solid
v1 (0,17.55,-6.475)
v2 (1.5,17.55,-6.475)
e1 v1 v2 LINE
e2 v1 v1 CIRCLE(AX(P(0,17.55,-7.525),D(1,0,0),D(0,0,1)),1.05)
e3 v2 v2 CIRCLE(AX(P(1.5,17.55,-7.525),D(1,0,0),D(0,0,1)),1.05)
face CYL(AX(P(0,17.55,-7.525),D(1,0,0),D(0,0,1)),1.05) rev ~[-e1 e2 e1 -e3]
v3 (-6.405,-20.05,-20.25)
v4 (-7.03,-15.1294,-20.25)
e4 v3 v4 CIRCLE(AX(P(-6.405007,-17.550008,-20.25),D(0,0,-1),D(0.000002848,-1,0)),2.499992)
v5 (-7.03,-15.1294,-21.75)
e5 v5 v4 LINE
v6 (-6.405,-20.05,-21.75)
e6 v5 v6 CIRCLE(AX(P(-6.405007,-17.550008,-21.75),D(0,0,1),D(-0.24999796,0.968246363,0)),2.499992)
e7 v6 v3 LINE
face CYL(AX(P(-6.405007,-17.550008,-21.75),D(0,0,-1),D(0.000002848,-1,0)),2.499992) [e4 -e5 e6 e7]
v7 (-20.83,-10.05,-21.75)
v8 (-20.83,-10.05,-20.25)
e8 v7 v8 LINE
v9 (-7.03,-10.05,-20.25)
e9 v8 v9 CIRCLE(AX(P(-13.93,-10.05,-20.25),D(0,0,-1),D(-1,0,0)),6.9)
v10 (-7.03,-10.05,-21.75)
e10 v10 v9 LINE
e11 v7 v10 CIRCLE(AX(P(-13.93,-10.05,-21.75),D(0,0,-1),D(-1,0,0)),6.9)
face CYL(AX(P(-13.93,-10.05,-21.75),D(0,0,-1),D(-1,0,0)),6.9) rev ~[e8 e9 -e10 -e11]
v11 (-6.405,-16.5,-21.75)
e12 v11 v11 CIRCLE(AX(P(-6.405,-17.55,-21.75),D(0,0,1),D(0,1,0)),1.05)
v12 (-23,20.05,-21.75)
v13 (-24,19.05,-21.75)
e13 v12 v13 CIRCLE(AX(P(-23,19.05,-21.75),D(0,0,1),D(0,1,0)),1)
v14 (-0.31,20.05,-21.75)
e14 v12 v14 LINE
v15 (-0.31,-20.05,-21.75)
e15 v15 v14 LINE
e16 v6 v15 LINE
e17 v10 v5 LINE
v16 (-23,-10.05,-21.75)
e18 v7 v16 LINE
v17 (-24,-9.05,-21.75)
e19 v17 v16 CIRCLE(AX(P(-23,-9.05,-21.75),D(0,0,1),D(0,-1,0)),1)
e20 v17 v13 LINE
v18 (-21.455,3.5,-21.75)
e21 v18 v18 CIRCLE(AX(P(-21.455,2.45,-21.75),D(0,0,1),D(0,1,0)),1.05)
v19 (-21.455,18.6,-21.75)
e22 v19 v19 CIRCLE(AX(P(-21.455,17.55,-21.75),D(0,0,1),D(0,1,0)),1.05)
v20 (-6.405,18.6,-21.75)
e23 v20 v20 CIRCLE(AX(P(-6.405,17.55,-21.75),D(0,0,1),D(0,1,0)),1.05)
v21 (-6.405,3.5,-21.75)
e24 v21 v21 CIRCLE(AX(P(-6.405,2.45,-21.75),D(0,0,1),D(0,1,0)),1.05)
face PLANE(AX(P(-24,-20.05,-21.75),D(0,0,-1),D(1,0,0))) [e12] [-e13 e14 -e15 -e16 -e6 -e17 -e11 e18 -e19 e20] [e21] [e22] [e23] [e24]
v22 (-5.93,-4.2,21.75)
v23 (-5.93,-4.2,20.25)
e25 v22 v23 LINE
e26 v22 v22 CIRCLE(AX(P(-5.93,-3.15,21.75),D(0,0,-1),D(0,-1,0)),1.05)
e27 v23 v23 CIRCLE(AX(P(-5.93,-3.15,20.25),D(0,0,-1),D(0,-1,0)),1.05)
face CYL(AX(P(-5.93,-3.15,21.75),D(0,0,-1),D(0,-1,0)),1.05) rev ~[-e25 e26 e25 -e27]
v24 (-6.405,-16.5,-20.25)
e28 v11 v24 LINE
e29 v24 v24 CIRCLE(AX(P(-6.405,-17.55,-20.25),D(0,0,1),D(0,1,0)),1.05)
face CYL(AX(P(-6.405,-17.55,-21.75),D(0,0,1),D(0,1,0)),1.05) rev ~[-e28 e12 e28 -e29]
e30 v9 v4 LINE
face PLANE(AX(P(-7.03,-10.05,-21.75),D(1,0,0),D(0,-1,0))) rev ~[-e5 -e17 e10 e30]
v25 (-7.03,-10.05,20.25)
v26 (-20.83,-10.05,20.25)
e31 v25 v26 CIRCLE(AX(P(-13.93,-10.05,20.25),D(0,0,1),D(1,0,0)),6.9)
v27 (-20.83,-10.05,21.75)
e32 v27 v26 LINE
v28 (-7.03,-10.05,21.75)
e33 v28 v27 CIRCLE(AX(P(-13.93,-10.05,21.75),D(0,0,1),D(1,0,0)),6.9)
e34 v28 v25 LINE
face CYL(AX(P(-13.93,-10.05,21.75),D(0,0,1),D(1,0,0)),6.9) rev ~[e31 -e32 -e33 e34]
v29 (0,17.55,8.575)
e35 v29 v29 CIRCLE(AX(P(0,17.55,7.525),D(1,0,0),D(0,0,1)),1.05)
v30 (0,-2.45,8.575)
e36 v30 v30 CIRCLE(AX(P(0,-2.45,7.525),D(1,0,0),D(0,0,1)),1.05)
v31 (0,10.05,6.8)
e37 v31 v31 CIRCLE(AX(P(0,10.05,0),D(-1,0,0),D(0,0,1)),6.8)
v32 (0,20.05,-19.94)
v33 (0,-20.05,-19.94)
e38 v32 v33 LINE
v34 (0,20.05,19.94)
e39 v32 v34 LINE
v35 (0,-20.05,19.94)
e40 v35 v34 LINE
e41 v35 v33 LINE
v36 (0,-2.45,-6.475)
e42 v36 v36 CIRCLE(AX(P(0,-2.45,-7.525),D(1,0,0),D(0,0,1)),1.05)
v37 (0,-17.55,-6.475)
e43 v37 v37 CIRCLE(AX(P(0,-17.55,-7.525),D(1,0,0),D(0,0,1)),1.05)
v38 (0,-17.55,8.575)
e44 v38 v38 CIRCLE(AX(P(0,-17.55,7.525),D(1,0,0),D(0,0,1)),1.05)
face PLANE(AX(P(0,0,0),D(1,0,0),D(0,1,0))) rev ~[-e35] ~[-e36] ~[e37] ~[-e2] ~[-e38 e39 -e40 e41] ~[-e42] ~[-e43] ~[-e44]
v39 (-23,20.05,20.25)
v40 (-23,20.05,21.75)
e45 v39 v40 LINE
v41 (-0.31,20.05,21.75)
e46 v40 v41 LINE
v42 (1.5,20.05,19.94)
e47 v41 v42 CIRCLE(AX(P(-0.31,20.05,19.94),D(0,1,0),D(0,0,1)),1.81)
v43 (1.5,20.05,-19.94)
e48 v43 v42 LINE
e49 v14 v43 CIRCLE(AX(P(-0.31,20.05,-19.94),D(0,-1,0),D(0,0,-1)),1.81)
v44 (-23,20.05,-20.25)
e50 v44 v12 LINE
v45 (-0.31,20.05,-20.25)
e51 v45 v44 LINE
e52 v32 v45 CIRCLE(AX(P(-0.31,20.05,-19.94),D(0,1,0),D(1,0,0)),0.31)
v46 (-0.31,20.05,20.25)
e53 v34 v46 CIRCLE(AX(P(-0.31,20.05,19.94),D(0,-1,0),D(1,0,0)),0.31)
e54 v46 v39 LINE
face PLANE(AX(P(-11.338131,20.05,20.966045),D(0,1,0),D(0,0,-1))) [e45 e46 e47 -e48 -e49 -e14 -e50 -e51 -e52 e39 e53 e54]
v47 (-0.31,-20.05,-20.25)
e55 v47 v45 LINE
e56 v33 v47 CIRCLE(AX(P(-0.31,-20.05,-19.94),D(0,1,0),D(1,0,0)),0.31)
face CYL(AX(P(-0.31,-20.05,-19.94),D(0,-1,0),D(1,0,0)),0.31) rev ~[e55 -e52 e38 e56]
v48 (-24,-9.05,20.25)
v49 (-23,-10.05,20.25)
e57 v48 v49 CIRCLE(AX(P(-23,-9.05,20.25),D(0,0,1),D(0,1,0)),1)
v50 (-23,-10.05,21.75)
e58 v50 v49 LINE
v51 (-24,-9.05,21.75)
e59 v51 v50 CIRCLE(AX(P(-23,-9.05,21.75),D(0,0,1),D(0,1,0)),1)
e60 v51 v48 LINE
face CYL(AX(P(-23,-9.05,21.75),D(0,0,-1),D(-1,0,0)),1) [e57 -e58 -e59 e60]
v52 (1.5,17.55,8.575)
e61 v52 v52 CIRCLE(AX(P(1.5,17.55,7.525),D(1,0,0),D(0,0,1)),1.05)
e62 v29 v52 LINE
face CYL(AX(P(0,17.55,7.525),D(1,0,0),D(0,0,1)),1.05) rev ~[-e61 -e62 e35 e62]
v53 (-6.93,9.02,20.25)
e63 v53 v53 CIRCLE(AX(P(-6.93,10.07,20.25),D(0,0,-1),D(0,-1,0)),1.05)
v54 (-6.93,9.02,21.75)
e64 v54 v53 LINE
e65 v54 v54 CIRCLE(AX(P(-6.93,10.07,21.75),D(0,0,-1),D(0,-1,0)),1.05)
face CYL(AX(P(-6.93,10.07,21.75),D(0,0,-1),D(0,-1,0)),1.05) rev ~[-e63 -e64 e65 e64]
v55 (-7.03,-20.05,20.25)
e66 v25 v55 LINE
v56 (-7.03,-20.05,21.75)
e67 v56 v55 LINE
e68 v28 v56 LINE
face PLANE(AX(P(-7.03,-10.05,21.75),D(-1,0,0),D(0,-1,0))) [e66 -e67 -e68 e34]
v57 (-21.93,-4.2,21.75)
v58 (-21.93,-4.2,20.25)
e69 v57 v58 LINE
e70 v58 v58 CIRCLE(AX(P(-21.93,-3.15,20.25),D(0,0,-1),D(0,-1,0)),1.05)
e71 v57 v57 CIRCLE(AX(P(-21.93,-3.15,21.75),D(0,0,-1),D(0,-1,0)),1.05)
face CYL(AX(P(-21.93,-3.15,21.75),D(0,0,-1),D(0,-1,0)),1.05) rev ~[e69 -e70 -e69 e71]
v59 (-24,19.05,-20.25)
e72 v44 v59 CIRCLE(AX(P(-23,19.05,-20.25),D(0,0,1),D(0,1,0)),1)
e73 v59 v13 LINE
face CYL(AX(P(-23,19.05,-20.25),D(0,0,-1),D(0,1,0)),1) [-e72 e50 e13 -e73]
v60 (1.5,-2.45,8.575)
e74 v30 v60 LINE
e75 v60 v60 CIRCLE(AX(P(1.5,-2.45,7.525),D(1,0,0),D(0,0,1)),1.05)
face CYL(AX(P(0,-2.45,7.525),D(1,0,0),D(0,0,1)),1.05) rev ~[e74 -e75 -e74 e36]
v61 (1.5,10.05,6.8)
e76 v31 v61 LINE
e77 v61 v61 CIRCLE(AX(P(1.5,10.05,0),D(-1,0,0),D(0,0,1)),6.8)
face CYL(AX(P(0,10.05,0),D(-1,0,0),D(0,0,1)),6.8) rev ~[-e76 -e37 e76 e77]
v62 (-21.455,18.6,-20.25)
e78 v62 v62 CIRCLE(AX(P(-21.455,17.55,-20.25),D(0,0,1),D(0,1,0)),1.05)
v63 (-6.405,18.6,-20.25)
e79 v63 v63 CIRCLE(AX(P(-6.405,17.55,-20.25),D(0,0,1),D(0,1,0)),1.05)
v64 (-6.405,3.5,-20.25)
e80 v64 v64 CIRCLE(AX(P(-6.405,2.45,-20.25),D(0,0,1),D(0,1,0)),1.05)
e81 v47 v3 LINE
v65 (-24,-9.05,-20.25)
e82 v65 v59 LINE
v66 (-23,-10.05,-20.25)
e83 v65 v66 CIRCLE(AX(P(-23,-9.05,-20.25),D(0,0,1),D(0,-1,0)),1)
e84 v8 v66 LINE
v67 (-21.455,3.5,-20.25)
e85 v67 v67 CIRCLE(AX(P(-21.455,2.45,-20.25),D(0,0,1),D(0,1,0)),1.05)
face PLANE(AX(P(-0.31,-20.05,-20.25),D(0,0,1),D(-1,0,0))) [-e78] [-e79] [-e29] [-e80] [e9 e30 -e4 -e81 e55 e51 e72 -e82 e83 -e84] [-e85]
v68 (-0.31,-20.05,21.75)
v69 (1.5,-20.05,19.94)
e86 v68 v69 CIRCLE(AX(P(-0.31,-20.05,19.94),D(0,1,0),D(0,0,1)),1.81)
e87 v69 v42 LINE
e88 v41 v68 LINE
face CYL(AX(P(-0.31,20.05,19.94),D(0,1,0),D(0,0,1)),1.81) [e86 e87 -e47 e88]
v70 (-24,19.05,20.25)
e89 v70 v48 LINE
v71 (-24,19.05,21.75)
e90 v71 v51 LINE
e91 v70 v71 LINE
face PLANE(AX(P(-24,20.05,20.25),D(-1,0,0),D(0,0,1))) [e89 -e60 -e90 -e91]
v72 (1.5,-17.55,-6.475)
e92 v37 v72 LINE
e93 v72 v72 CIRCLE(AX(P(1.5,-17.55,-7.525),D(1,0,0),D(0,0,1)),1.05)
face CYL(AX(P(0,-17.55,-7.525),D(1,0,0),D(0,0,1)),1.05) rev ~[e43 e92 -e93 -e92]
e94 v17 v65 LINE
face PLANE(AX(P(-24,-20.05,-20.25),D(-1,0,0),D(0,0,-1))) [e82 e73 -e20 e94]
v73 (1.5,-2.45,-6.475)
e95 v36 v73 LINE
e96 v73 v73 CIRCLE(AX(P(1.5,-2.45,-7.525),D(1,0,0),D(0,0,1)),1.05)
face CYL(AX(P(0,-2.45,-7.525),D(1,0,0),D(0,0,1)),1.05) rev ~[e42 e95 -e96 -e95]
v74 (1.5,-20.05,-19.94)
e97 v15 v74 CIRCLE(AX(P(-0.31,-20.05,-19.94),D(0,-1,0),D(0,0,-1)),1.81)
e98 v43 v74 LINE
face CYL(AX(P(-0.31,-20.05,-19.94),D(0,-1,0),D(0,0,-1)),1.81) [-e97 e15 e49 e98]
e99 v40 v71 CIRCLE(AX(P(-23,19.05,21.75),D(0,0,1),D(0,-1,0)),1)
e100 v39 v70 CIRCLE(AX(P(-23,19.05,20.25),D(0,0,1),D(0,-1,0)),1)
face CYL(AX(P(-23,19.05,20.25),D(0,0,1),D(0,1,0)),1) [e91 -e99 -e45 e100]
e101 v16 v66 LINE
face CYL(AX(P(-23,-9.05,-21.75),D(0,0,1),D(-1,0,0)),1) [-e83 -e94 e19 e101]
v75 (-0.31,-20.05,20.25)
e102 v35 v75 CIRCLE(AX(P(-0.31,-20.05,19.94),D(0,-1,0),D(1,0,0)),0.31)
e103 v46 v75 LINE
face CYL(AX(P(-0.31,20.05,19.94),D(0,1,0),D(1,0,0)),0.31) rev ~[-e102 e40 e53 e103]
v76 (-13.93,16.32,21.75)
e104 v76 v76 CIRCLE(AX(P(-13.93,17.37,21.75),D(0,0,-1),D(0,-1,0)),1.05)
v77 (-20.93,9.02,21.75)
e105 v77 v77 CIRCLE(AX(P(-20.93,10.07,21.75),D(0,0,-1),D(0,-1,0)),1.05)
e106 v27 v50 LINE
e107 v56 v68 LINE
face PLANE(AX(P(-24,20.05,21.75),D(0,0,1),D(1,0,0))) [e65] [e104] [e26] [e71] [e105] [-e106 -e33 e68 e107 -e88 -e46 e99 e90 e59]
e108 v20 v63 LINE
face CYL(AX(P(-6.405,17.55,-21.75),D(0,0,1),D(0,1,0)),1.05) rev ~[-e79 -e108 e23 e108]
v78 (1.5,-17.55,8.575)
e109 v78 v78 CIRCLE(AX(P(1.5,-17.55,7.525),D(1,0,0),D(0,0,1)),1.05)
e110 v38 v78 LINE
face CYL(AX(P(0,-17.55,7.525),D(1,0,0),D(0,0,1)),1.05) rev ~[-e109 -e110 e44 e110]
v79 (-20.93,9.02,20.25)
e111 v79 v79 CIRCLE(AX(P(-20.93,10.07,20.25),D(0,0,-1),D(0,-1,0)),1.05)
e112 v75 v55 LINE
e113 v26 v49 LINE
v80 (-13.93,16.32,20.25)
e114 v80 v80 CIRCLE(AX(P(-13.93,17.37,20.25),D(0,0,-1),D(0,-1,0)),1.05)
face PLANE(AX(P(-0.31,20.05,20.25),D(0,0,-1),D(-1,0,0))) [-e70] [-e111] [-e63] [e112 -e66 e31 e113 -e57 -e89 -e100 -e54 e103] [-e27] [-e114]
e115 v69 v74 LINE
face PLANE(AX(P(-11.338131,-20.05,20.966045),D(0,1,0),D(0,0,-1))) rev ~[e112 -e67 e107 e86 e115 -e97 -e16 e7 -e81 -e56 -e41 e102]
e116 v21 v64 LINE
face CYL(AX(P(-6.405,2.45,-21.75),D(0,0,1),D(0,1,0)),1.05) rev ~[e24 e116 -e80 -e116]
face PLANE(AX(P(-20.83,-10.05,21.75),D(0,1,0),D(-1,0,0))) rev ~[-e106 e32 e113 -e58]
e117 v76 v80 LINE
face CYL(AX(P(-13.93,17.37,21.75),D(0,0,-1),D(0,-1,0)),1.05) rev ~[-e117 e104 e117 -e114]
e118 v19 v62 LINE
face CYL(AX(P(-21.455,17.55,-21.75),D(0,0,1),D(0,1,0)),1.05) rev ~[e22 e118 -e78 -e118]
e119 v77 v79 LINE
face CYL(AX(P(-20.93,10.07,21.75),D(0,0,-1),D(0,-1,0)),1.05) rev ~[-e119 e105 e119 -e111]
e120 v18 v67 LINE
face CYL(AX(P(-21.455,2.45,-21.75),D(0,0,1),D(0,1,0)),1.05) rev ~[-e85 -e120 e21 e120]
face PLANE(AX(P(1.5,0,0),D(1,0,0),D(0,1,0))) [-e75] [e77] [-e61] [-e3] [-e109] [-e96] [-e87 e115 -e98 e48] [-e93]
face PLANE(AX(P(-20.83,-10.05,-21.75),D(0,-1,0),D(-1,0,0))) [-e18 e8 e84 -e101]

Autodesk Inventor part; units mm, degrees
ref_plane "YZ Plane" through (0, 0, 0) normal (1, 0, 0) x (0, 1, 0)
ref_plane "XZ Plane" through (0, 0, 0) normal (0, 1, 0) x (-1, 0, 0)
ref_plane "XY Plane" through (0, 0, 0) normal (0, 0, 1) x (1, 0, 0)
sketch "Sketch1" plane through (0, 0, 0) normal (1, 0, 0) x (0, 1, 0)
  line L0 (20.05, 20.25) -> (-20.05, 20.25)
  line L1 (-20.05, 20.25) -> (-20.05, -20.25)
  line L2 (-20.05, -20.25) -> (20.05, -20.25)
  line L3 (20.05, -20.25) -> (20.05, 20.25)
  line L4 (20.05, 20.25) -> (-20.05, -20.25) construction
  line L5 (-20.05, 20.25) -> (20.05, -20.25) construction
  point P0 (0, 0)
  dimension "d0" = 40.1
  dimension "d1" = 40.5
extrude "Plate1" add sketch "Sketch1" along normal blind 1.5
sketch "Sketch2" plane through (0, 20.05, 20.25) normal (0, 0, 1) x (1, 0, 0)
  line L0 (0, -40.1) -> (0, 0)
  line L1 (0, 0) -> (-24, 0)
  line L2 (-24, 0) -> (-24, -40.1)
  line L3 (-24, -40.1) -> (0, -40.1)
edge flange "Flange1" height 25.5 angle 90 thickness 1.5 bend radius 0.31 thickness toward (0, 0, 1) relief tear relief width 1.5 relief depth 0.75 corner gap 0.31 corner form 0 edges at (0, 0, 20.25) (0, 0, -20.25) wall of the first edge with corners at (0, -20.05, 20.25) (0, 20.05, 20.25) (-24, 20.05, 20.25) (-24, -20.05, 20.25)
bend "Bend1"
corner "Corner1"
sketch "Sketch3" plane through (-24, -20.05, 21.75) normal (0, 0, 1) x (1, 0, 0)
  circle A0 centre (10.07, 10) radius 6.4 projected
  line L0 (0, 0) -> (0, 40.1) projected
  line L1 (23.69, 0) -> (0, 0) projected
  line L2 (23.69, 0) -> (23.69, 40.1) projected
  circle A1 centre (10.07, 10) radius 6.9
  line L3 (3.17, 10) -> (0, 10)
  line L4 (16.97, 10) -> (16.97, 0)
  point P0 (24, 20.05)
  point P1 (10.07, 3.1)
  point P2 (10.07, 0)
  dimension "d13" = 0.5
sketch "Sketch4" plane through (-24, -20.05, -21.75) normal (0, 0, -1) x (-1, 0, 0)
  line L0 (-3.17, 10) -> (0, 10) projected
  line L1 (0, 0) -> (0, 40.1) projected
  circle A0 centre (-10.07, 10) radius 6.9 projected
  line L2 (-16.97, 10) -> (-16.97, 0) projected
  line L3 (-23.69, 0) -> (0, 0) projected
  arc A1 (-17.595, 0) -> (-16.97, 4.9206) centre (-17.595, 2.5) ccw
  point P0 (-24, 20.05)
  point P1 (-10.07, 0)
  dimension "d43" = 5
  dimension "d44" = 2.5
  dimension "d45" = 0.625
extrude "Cut1" cut sketch "Sketch3" against normal blind 1.5 contours A0 | L0 L3 A1 L4 L1 | A1
extrude "Cut2" cut sketch "Sketch4" against normal blind 1.5 contours A0 | L0 L1 L3 L2 A1 A0 | L3 A1 L2
ref_plane "Work Plane1" through (-24, 20.05, 0) normal (0, 0, 1) x (1, 0, 0)
sketch "Sketch5" plane through (-24, 20.05, 21.75) normal (0, 0, 1) x (1, 0, 0)
  circle A0 centre (18.07, -23.2) radius 0.7835 projected
  circle A1 centre (2.07, -23.2) radius 0.7835 projected
  circle A2 centre (3.07, -9.98) radius 0.7835 projected
  circle A3 centre (17.07, -9.98) radius 0.7835 projected
  circle A4 centre (10.07, -2.68) radius 0.7835 projected
  point P0 (24, -20.05)
hole "Hole1" at (-13.93, 17.37, 21.75) at (-20.93, 10.07, 21.75) at (-6.93, 10.07, 21.75) at (-21.93, -3.15, 21.75) at (-5.93, -3.15, 21.75) direction (0, 0, -1) diameter 2.1 depth 1.5
sketch "Sketch6" plane through (-0.31, 20.05, -21.75) normal (0, 0, -1) x (-1, 0, 0)
  circle A0 centre (6.095, -17.6) radius 0.7835 projected
  circle A1 centre (6.095, -2.5) radius 0.7835 projected
  circle A2 centre (21.145, -2.5) radius 0.7835 projected
  circle A3 centre (21.145, -17.6) radius 0.7835 projected
  circle A4 centre (6.095, -37.6) radius 0.7835 projected
  point P0 (-0.31, -20.05)
fillet "Corner Round1" radius 1 4 edges at (-24, 20.05, -21) (-24, -10.05, -21) (-24, 20.05, 21) (-24, -10.05, 21)
sketch "Sketch7" plane through (0, 0, 0) normal (-1, 0, 0) x (0, 0, 1)
  circle A0 centre (0, 10.05) radius 6.4 projected
  circle A1 centre (0, 10.05) radius 6.8
  point P0 (0, 0)
  dimension "d26" = 0.4
extrude "Cut3" cut sketch "Sketch7" against normal blind 1.5 contours A0 | A1
sketch "Sketch8" plane through (0, 0, 0) normal (-1, 0, 0) x (0, 0, 1)
  circle A0 centre (7.525, 17.55) radius 0.7835 projected
  circle A1 centre (-7.525, 17.55) radius 0.7835 projected
  circle A2 centre (7.525, -2.45) radius 0.7835 projected
  circle A3 centre (-7.525, -2.45) radius 0.7835 projected
  circle A4 centre (7.525, -17.55) radius 0.7835 projected
  circle A5 centre (-7.525, -17.55) radius 0.7835 projected
  point P0 (0, 0)
hole "Hole2" at (0, 17.55, -7.525) at (0, 17.55, 7.525) at (0, -2.45, -7.525) at (0, -2.45, 7.525) at (0, -17.55, -7.525) at (0, -17.55, 7.525) direction (1, 0, 0) diameter 2.1 depth 1.5
hole "Hole3" at (-6.405, 17.55, -21.75) at (-21.455, 17.55, -21.75) at (-6.405, 2.45, -21.75) at (-21.455, 2.45, -21.75) at (-6.405, -17.55, -21.75) direction (0, 0, 1) diameter 2.1 depth 1.5
equation "\"d14\" = Thickness"
equation "\"d16\" = Thickness"
equation "\"d23\" = Thickness"
equation "\"d27\" = Thickness"
equation "\"d34\" = Thickness"
equation "\"d41\" = Thickness"
equation "\"d2\" = Thickness"
equation "\"d3\" = BendReliefWidth"
equation "\"d4\" = BendReliefDepth"
equation "\"d5\" = MinimumRemnant"
equation "\"d6\" = TransitionRadius"
equation "\"d9\" = BendRadius"
equation "\"d10\" = CornerReliefSize"
equation "\"d11\" = GapSize"
equation "\"d12\" = JacobiRadiusSize"
equation "\"BendReliefWidth\" = Thickness"
equation "\"BendReliefDepth\" = 0.5 * Thickness"
equation "\"CornerReliefSize\" = 4 * Thickness"
equation "\"MinimumRemnant\" = 2 * Thickness"
equation "\"TransitionRadius\" = BendRadius"
equation "\"JacobiRadiusSize\" = BendRadius"
equation "\"GapSize\" = Thickness"
equation "\"Thickness\" = 1.5"
equation "\"BendRadius\" = 0.31"
properties part number "axis_3_top_frame" material "Aluminum 6061-AHC"
